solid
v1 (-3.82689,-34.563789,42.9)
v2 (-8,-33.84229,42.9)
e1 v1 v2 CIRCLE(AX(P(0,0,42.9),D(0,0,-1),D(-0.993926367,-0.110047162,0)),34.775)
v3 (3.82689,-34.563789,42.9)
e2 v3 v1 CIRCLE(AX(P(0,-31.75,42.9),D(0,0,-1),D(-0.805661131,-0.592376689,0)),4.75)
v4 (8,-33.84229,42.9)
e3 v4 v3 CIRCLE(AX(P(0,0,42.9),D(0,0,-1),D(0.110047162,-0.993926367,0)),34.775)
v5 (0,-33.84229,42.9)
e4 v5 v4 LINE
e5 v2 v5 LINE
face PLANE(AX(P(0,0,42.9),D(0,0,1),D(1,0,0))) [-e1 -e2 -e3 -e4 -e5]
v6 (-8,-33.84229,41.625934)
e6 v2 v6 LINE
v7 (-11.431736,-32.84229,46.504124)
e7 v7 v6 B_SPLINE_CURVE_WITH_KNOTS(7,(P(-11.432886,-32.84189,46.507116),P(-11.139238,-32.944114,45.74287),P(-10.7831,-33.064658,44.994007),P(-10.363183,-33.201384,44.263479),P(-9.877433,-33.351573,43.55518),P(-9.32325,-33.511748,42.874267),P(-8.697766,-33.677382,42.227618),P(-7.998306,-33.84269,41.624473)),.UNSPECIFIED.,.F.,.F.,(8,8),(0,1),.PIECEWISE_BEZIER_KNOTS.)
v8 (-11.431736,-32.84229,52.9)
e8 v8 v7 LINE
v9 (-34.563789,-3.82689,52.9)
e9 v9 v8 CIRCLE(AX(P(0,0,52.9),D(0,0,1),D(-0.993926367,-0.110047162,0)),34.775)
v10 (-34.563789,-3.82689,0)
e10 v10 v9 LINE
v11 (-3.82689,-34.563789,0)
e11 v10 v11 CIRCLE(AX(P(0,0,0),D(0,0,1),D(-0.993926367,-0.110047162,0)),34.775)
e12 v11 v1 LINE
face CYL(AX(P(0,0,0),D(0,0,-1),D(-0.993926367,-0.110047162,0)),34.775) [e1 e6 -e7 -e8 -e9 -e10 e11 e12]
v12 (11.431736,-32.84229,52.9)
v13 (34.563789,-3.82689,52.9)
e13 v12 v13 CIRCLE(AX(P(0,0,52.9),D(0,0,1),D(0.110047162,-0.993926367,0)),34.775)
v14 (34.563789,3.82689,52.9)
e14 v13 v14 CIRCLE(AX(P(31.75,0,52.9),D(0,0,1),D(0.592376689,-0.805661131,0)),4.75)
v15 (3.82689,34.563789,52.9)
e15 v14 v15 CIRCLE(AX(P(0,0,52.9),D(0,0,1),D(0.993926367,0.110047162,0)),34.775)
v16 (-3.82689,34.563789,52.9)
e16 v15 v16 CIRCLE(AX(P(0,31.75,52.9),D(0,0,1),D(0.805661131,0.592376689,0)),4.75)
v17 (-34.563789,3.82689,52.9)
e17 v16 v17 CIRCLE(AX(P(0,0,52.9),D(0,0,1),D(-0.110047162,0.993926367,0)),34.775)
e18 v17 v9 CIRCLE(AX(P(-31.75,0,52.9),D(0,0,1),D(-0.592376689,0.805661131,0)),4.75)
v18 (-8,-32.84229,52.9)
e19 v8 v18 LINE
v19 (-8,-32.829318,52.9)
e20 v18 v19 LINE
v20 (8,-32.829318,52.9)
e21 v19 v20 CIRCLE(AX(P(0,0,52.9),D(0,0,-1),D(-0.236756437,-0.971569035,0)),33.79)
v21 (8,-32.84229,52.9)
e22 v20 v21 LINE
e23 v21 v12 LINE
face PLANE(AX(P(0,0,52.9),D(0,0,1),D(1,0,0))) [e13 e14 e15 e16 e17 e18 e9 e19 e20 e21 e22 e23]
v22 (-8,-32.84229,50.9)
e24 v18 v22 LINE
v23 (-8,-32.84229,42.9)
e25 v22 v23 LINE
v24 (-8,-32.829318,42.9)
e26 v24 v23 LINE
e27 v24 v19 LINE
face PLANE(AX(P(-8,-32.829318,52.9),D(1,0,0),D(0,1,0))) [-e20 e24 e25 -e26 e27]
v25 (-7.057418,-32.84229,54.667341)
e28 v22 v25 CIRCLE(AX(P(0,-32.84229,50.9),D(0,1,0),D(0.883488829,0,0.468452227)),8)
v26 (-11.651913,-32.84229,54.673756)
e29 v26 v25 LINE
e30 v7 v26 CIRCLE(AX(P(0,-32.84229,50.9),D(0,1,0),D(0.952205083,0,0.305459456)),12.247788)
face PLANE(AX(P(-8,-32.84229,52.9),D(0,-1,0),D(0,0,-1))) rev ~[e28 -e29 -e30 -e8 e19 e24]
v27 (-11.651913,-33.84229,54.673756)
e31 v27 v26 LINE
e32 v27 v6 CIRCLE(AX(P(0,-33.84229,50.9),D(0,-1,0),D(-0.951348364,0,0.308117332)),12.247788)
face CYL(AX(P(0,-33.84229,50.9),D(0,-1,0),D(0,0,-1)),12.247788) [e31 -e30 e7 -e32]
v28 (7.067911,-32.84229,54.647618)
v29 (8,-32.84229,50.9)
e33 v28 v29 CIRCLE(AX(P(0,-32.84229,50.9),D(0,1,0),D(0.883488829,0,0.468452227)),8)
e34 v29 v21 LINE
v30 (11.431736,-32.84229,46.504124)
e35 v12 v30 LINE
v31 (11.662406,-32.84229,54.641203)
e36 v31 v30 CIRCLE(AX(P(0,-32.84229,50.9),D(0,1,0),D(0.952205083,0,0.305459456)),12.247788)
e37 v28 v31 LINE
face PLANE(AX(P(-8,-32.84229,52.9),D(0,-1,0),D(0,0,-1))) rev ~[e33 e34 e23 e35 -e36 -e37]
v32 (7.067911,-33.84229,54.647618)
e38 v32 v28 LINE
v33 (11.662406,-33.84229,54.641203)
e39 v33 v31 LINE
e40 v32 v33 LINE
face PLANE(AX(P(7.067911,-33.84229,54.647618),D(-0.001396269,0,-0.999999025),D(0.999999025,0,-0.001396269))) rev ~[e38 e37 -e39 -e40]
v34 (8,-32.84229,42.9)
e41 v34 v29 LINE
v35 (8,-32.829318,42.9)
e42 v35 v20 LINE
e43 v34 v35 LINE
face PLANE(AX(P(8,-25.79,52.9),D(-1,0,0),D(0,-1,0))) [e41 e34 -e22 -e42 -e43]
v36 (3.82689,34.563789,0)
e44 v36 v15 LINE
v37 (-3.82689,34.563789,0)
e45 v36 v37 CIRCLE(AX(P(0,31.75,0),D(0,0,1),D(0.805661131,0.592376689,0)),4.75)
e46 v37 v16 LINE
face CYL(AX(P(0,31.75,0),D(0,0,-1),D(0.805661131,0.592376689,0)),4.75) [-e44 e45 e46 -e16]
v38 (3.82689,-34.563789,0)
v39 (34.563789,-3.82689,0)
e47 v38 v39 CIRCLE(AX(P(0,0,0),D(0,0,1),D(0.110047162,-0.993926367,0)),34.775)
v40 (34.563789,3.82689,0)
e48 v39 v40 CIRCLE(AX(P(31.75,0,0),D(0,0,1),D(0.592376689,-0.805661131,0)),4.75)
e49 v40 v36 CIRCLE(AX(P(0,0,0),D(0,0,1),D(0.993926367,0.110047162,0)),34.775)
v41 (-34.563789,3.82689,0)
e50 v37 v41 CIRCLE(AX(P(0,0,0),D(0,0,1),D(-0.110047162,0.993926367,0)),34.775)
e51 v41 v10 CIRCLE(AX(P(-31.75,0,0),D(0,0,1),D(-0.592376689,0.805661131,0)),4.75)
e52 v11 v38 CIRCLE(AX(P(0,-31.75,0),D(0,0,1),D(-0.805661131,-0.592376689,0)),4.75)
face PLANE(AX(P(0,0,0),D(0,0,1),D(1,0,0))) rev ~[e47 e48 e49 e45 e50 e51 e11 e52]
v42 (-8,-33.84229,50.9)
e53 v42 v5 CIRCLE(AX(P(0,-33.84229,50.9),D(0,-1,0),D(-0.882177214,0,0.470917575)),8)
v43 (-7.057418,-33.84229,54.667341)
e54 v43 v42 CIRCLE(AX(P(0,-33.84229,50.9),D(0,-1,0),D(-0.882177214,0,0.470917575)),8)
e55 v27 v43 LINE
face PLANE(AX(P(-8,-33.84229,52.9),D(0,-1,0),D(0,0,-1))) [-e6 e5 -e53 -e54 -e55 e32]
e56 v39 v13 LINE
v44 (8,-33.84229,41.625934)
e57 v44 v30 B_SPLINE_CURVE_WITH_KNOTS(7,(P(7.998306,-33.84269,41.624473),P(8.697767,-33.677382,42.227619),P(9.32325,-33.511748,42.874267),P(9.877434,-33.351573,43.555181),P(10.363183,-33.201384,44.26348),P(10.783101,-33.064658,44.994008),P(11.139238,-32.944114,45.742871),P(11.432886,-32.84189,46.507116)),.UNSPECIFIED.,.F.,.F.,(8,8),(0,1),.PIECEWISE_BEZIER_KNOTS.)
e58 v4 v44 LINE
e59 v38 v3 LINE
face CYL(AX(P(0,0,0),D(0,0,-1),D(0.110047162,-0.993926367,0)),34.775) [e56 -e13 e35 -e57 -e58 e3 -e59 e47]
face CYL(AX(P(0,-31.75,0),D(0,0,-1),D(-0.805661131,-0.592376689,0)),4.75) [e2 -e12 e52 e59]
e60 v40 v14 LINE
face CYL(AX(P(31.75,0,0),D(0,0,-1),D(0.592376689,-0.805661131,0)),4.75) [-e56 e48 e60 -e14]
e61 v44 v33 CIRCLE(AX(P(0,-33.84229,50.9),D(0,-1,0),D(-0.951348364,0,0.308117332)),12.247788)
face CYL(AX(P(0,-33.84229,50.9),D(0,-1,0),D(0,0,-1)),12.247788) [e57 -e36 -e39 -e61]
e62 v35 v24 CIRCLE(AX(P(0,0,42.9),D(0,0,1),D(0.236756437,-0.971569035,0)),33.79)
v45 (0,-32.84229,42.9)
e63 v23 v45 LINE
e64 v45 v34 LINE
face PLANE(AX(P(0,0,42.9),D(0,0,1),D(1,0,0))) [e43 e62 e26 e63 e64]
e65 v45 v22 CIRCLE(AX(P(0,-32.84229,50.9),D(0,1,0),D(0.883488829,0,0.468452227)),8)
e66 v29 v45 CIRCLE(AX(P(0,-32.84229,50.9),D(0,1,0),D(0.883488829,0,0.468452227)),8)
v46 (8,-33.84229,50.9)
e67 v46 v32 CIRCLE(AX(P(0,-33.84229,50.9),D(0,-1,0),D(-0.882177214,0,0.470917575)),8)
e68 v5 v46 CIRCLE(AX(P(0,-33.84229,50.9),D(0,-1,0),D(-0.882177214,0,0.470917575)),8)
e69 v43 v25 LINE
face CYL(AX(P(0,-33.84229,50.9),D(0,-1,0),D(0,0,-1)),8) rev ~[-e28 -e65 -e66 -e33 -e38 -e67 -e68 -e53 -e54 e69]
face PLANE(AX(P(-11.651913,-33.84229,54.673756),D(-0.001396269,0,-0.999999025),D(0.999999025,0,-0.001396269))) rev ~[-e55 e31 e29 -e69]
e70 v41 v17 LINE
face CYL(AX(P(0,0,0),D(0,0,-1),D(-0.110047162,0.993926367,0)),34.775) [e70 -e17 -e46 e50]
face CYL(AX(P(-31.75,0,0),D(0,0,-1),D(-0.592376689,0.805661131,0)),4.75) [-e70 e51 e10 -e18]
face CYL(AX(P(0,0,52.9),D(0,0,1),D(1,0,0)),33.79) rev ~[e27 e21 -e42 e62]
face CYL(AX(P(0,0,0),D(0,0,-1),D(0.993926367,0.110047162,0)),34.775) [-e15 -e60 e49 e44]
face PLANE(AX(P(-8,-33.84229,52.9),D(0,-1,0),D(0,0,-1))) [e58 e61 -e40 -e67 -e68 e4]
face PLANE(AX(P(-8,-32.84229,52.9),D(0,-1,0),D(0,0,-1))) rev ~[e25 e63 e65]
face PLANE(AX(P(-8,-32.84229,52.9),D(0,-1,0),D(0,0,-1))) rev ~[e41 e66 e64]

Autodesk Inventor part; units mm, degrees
ref_plane "YZ Plane" through (0, 0, 0) normal (1, 0, 0) x (0, 1, 0)
ref_plane "XZ Plane" through (0, 0, 0) normal (0, 1, 0) x (-1, 0, 0)
ref_plane "XY Plane" through (0, 0, 0) normal (0, 0, 1) x (1, 0, 0)
sketch "Sketch1" plane through (0, 0, 0) normal (0, 0, 1) x (1, 0, 0)
  circle A0 centre (0, 0) radius 11.25
  circle A1 centre (0, 0) radius 35.025
  circle A2 centre (0, 0) radius 37.030393
  arc A3 (-32.79294, -17.200962) -> (-31.29294, -19.799038) centre (0, 0) ccw
  line L0 (-32.79294, -17.200962) -> (-31.05471, -16.197395)
  line L1 (-32.79294, -17.200962) -> (-31.05471, -16.197395)
  line L2 (-29.55471, -18.795471) -> (-31.29294, -19.799038)
  line L3 (-31.29294, -19.799038) -> (-29.55471, -18.795471)
  line L4 (-16.197395, -31.05471) -> (-17.200962, -32.79294)
  line L5 (-17.200962, -32.79294) -> (-16.197395, -31.05471)
  arc A4 (-19.799038, -31.29294) -> (-17.200962, -32.79294) centre (0, 0) ccw
  line L6 (-19.799038, -31.29294) -> (-18.795471, -29.55471)
  line L7 (-19.799038, -31.29294) -> (-18.795471, -29.55471)
  arc A5 (17.200962, -32.79294) -> (19.799038, -31.29294) centre (0, 0) ccw
  line L8 (17.200962, -32.79294) -> (16.197395, -31.05471)
  line L9 (17.200962, -32.79294) -> (16.197395, -31.05471)
  line L10 (18.795471, -29.55471) -> (19.799038, -31.29294)
  line L11 (19.799038, -31.29294) -> (18.795471, -29.55471)
  arc A6 (31.29294, -19.799038) -> (32.79294, -17.200962) centre (0, 0) ccw
  line L12 (31.29294, -19.799038) -> (29.55471, -18.795471)
  line L13 (31.05471, -16.197395) -> (32.79294, -17.200962)
  line L14 (32.79294, -17.200962) -> (31.05471, -16.197395)
  line L15 (32.79294, 17.200962) -> (31.05471, 16.197395)
  line L16 (32.79294, 17.200962) -> (31.05471, 16.197395)
  arc A7 (32.79294, 17.200962) -> (31.29294, 19.799038) centre (0, 0) ccw
  line L17 (29.55471, 18.795471) -> (31.29294, 19.799038)
  line L18 (31.29294, 19.799038) -> (29.55471, 18.795471)
  line L19 (16.197395, 31.05471) -> (17.200962, 32.79294)
  line L20 (17.200962, 32.79294) -> (16.197395, 31.05471)
  line L21 (19.799038, 31.29294) -> (18.795471, 29.55471)
  line L22 (19.799038, 31.29294) -> (18.795471, 29.55471)
  line L23 (-17.200962, 32.79294) -> (-16.197395, 31.05471)
  line L24 (-17.200962, 32.79294) -> (-16.197395, 31.05471)
  line L25 (-18.795471, 29.55471) -> (-19.799038, 31.29294)
  line L26 (-19.799038, 31.29294) -> (-18.795471, 29.55471)
  arc A8 (-31.29294, 19.799038) -> (-32.79294, 17.200962) centre (0, 0) ccw
  line L27 (-31.29294, 19.799038) -> (-29.55471, 18.795471)
  line L28 (-31.29294, 19.799038) -> (-29.55471, 18.795471)
  line L29 (-31.05471, 16.197395) -> (-32.79294, 17.200962)
  line L30 (-32.79294, 17.200962) -> (-31.05471, 16.197395)
  arc A9 (-34.800207, -3.961848) -> (-34.800207, 3.961848) centre (-31.75, 0) ccw
  circle A10 centre (-31.75, 0) radius 5
  arc A11 (-3.961848, 34.800207) -> (3.961848, 34.800207) centre (0, 31.75) ccw
  circle A12 centre (0, 31.75) radius 5
  circle A13 centre (31.75, 0) radius 5
  circle A14 centre (31.75, 0) radius 5
  arc A15 (-3.961848, -34.800207) -> (3.961848, -34.800207) centre (0, -31.75) ccw
  circle A16 centre (0, -31.75) radius 5
  circle A17 centre (0, 31.75) radius 4.75
  circle A18 centre (-31.75, 0) radius 4.75
  circle A19 centre (0, -31.75) radius 4.75
  circle A20 centre (31.75, 0) radius 4.75
  circle A21 centre (0, 0) radius 34.775
  circle A22 centre (0, 0) radius 36.75
  point P0 (0, 0)
  point P1 (0, 49.75)
  point P2 (34.563789, -3.82689)
  point P3 (34.563789, 3.82689)
  point P4 (3.82689, 34.563789)
  point P5 (-3.82689, 34.563789)
  point P6 (-34.563789, 3.82689)
  point P7 (-34.563789, -3.82689)
  point P8 (-3.82689, -34.563789)
  point P9 (3.82689, -34.563789)
  dimension "d6" = 70.05
  dimension "d8" = 74.06079
  dimension "d0" = 10
  dimension "d1" = 0.25
  dimension "d4" = 360
  dimension "d7" = 0.25
  dimension "d9" = 73.5
sketch "Sketch1 outline for Extrusion1" plane through (0, 0, 0) normal (0, 0, 1) x (1, 0, 0)
  arc A0 (3.82689, -34.563789) -> (34.563789, -3.82689) centre (0, 0) ccw
  arc A1 (-3.82689, -34.563789) -> (3.82689, -34.563789) centre (0, -31.75) ccw
  arc A2 (-34.563789, -3.82689) -> (-3.82689, -34.563789) centre (0, 0) ccw
  arc A3 (-34.563789, 3.82689) -> (-34.563789, -3.82689) centre (-31.75, 0) ccw
  arc A4 (-3.82689, 34.563789) -> (-34.563789, 3.82689) centre (0, 0) ccw
  arc A5 (3.82689, 34.563789) -> (-3.82689, 34.563789) centre (0, 31.75) ccw
  arc A6 (34.563789, 3.82689) -> (3.82689, 34.563789) centre (0, 0) ccw
  arc A7 (34.563789, -3.82689) -> (34.563789, 3.82689) centre (31.75, 0) ccw
extrude "Extrusion1" add sketch "Sketch1 outline for Extrusion1" along normal blind 52.9
sketch "Skizze4" plane through (0, 0, 52.9) normal (0, 0, 1) x (1, 0, 0)
  circle A0 centre (0, 0) radius 33.79
  dimension "d24" = 67.58
extrude "Extrusion4" cut sketch "Skizze4" against normal blind 10
sketch "Skizze5" plane through (0, 0, 52.9) normal (0, 0, 1) x (1, 0, 0)
  line L0 (-8, -25.79) -> (8, -25.79)
  line L1 (8, -25.79) -> (8, -41.79)
  line L2 (8, -41.79) -> (-8, -41.79)
  line L3 (-8, -41.79) -> (-8, -25.79)
  circle A0 centre (0, 0) radius 33.79 projected
  line L4 (-8, -25.79) -> (8, -41.79) construction
  line L5 (8, -25.79) -> (-8, -41.79) construction
  point P0 (0, -33.79)
  dimension "d27" = 16
  dimension "d28" = 16
extrude "Extrusion5" cut sketch "Skizze5" against normal up to surface (10 mm away) contours L0 L1 A0 L3 | A0 L1 L2 L3 picked at (-0.896461, -28.420935)
ref_plane "Arbeitsebene1" through (-8, -33.84229, 52.9) normal (0, -1, 0) x (0, 0, -1)
sketch "Skizze8" plane through (-8, -33.84229, 52.9) normal (0, -1, 0) x (0, 0, -1)
  circle A0 centre (2, 8) radius 8
  circle A1 centre (2, 8) radius 12.247788
  line L0 (-1.778493, -7.044693) -> (-1.736571, 22.979568)
  line L1 (10, 0) -> (2, 0)
  line L2 (2, 0) -> (2, 8)
  line L3 (2, 8) -> (10, 8)
  line L4 (10, 8) -> (10, 0)
  point P0 (52.9, 8)
  point P1 (3.776106, -5.296677)
  point P2 (-1.741203, 19.662406)
  point P3 (-1.747618, 15.067911)
  point P4 (-1.76734, 0.942582)
  point P5 (-1.773756, -3.651913)
  dimension "d31" = 16
  dimension "d36" = 8
extrude "Extrusion6" add sketch "Skizze8" against normal blind 1 contours L1 L4 A0 L0 A1 | A0 L4 L1
properties part number "2024_08_26_Double_walled_beaker_recess_2,1cm"
